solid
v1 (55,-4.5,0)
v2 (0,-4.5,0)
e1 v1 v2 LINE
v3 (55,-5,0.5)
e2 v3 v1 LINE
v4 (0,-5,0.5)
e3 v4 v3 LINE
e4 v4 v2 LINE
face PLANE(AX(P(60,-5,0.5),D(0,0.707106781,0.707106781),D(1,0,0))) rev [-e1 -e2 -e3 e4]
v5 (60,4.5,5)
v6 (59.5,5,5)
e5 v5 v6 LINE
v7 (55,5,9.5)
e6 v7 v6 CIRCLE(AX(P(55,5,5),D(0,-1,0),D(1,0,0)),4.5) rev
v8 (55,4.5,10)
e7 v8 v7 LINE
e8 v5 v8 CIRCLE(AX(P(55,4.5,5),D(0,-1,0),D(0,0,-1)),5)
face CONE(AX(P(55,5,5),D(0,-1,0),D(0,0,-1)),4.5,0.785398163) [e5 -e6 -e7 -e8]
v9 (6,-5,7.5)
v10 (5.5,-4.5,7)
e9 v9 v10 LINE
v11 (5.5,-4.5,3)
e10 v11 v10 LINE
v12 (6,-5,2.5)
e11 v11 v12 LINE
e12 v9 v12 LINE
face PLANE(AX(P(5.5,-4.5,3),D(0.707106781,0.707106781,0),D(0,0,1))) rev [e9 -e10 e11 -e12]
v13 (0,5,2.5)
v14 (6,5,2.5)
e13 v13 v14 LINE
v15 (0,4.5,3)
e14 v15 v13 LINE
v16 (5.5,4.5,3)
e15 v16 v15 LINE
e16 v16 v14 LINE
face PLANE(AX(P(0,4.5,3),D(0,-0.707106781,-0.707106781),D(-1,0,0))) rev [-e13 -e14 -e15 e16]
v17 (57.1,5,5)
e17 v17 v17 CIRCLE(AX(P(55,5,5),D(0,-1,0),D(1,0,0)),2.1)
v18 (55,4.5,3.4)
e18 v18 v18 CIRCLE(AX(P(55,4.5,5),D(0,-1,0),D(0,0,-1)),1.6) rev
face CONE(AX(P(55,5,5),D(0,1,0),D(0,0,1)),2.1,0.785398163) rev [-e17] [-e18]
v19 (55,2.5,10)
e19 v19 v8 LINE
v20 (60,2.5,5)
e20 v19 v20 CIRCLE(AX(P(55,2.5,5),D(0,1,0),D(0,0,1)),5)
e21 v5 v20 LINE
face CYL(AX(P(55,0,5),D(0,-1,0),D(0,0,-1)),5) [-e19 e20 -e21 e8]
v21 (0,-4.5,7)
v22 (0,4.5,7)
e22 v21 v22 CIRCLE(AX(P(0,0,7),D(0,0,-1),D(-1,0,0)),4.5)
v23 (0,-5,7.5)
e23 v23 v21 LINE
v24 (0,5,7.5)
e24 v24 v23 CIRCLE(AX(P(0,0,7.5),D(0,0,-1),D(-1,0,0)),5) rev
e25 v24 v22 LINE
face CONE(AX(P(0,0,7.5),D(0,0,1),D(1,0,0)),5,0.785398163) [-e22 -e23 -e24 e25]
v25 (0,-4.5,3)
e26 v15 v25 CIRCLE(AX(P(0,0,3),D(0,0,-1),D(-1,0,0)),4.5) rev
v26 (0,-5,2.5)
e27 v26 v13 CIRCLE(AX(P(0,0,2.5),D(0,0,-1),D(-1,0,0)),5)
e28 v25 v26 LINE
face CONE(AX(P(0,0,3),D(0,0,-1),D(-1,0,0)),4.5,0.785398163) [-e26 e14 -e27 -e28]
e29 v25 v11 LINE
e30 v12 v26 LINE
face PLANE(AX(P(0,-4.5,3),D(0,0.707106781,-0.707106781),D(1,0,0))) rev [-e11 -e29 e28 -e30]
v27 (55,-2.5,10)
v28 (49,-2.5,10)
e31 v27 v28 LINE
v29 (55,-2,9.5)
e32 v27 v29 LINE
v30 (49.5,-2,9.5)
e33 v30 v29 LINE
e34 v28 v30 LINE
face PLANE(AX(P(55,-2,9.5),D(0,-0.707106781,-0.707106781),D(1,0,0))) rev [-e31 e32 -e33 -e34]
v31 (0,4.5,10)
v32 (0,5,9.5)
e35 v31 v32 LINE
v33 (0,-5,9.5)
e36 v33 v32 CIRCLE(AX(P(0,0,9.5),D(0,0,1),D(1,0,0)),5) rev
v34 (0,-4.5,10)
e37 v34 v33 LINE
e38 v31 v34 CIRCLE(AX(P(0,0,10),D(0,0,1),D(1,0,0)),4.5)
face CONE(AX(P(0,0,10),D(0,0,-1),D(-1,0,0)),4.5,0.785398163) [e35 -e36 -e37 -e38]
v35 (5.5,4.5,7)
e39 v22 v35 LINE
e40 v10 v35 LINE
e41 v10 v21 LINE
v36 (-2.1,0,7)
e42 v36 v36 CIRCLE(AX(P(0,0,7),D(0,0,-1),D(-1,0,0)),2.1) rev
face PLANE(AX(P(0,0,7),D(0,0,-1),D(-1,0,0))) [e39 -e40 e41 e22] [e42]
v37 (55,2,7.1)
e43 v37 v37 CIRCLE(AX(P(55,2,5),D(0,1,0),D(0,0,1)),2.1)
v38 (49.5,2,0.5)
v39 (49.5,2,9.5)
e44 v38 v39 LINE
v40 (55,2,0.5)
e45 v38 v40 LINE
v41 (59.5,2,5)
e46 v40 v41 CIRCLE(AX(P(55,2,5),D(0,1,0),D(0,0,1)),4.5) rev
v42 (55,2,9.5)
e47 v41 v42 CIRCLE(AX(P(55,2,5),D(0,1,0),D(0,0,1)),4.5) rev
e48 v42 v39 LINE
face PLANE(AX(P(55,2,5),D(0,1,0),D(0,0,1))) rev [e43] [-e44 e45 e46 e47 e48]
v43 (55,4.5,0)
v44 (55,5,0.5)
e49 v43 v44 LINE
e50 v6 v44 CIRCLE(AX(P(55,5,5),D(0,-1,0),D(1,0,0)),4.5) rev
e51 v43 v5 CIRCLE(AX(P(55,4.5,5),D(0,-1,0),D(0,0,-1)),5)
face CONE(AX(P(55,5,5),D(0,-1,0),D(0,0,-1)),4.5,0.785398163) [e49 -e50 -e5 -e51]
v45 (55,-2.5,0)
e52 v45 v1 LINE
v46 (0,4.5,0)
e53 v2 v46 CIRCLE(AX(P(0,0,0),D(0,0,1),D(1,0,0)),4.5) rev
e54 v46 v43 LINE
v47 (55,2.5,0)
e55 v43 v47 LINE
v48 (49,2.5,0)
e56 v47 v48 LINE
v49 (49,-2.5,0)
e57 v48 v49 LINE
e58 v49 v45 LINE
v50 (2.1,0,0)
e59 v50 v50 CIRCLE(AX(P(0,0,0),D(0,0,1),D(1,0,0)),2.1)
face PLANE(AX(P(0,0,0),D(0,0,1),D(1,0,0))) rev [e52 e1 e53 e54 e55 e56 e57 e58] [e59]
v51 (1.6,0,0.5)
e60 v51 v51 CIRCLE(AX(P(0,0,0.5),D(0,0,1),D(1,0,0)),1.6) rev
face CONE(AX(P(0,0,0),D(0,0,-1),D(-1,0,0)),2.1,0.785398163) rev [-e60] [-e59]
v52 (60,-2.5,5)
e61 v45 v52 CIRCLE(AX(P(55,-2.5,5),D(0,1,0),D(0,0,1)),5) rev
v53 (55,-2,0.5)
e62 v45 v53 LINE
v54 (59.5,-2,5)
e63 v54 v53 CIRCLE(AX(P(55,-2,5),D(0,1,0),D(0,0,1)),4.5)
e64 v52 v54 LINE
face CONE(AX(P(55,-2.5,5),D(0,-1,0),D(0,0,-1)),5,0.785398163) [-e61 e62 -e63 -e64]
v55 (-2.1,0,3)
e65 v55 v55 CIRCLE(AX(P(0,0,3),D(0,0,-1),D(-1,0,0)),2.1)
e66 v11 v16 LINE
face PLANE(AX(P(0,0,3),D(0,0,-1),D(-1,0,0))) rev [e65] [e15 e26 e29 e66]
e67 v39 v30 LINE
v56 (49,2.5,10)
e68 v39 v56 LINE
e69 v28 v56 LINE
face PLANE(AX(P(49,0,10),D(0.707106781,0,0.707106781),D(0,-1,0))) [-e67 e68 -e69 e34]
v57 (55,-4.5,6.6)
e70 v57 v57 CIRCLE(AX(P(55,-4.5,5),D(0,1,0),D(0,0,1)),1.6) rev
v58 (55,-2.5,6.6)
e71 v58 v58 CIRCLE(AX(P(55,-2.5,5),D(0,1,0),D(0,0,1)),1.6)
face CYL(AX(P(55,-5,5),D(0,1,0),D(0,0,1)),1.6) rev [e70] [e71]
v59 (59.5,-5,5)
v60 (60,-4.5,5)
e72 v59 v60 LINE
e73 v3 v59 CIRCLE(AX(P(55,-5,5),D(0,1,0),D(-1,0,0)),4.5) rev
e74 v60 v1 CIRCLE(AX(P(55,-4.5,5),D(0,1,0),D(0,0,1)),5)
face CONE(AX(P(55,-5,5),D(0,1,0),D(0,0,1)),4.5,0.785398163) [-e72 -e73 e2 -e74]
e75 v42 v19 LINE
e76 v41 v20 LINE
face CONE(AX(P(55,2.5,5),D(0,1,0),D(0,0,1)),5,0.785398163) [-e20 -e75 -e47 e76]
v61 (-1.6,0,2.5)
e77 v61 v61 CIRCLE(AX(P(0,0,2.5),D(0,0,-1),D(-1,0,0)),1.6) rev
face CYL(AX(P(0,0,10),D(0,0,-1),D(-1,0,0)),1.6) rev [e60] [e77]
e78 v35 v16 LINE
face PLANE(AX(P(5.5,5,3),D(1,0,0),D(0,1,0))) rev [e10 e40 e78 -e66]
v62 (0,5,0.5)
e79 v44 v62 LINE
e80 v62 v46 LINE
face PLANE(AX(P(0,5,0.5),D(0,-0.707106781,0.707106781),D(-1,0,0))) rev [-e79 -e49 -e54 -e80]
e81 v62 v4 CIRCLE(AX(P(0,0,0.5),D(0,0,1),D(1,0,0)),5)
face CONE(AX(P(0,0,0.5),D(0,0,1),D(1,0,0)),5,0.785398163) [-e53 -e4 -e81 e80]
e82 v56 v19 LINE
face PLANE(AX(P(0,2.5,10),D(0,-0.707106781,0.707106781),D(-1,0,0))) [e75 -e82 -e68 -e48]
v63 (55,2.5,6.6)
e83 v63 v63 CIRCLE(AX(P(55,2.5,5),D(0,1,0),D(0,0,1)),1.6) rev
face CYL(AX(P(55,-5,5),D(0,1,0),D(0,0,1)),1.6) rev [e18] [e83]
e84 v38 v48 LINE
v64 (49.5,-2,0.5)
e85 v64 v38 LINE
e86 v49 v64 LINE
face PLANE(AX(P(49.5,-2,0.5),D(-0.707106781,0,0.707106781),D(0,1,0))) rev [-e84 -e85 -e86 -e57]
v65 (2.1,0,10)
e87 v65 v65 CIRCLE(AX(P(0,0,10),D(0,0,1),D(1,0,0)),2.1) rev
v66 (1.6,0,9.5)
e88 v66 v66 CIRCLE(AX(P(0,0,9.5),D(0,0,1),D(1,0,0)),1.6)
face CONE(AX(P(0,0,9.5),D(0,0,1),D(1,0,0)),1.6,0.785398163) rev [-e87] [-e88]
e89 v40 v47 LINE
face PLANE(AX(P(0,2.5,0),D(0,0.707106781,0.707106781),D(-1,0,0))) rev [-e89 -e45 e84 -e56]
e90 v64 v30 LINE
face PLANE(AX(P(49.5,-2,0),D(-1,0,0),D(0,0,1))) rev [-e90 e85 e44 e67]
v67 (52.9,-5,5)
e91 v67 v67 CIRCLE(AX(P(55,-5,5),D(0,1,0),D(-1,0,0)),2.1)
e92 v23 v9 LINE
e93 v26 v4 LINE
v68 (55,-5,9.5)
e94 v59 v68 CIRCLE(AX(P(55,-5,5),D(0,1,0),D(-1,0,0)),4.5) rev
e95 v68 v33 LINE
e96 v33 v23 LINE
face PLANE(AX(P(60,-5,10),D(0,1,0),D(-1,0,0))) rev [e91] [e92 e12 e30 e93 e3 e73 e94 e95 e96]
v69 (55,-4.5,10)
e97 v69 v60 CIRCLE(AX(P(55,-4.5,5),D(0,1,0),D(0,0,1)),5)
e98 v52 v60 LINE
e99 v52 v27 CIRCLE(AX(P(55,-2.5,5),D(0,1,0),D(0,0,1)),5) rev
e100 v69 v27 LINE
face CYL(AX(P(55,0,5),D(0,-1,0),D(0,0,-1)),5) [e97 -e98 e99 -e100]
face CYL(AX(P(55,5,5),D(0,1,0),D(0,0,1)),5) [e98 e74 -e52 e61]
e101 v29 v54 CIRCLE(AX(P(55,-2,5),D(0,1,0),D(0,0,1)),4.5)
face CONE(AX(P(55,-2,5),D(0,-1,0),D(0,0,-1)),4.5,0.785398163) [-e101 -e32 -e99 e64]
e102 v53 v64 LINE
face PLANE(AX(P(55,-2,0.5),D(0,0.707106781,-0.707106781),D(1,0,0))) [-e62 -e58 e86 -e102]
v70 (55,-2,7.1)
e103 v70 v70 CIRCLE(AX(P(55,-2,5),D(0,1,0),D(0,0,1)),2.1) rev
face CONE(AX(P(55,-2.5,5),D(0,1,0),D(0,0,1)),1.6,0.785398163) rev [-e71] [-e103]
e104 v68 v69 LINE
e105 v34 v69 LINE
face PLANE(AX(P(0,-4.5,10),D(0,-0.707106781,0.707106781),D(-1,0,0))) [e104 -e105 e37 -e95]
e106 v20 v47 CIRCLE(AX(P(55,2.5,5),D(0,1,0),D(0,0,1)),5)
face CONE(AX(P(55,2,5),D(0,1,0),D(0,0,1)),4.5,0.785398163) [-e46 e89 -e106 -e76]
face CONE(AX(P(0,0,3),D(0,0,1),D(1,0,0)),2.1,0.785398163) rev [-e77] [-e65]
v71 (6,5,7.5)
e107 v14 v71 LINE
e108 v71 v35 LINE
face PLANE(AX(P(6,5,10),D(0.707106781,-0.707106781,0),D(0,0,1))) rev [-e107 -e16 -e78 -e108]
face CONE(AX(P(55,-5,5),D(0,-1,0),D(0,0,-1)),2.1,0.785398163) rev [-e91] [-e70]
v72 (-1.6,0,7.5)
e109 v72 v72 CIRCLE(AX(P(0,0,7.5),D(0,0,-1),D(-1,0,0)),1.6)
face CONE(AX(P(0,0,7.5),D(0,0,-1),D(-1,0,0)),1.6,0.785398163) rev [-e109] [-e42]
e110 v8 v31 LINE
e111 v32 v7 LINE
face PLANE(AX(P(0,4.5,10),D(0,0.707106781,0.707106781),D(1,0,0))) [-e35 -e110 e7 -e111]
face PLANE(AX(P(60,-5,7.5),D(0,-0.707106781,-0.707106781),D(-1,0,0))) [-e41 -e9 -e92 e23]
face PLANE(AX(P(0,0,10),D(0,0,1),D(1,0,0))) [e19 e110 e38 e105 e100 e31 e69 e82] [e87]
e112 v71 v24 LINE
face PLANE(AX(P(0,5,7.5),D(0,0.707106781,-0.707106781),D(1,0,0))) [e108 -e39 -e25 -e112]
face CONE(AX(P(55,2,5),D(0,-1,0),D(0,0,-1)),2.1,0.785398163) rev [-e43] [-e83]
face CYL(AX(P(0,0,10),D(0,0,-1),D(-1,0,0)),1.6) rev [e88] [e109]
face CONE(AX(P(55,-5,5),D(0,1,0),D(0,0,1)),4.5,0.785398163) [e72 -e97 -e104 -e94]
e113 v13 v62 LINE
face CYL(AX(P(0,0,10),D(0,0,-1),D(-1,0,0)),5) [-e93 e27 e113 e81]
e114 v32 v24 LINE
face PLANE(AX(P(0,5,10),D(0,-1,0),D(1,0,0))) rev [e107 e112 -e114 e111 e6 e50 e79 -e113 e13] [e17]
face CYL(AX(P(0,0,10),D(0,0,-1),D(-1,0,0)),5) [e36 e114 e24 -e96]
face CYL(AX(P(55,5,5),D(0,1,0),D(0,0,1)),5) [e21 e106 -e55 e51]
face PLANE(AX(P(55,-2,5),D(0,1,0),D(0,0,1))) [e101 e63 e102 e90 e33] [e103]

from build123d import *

# Parameters (mm, degrees)
SKETCH1_R               = 1.6
BOSS_EXTRUDE1_DEPTH     = 10
CUT_EXTRUDE1_START      = -7
CUT_EXTRUDE1_DEPTH      = 4
FILLET1_R               = 5
CUT_EXTRUDE2_START      = 49.5
CUT_EXTRUDE2_OUTLINE_W  = 4
CUT_EXTRUDE2_OUTLINE_H  = 10
CUT_EXTRUDE2_DEPTH      = 10.5
CUT_EXTRUDE3_DEPTH      = 62.64414003
CUT_EXTRUDE3_DEPTH_BACK = 62.64414003
SKETCH5_R               = 1.6
CHAMFER1_SIZE           = 0.5


# Read off the part's stored shape, not the designer's step: Cut-Extrude2
with BuildPart() as part:
    # Sketch1 → Boss-Extrude1 (new body)
    with BuildSketch(Plane.XY):
        with BuildLine():
            Line((0, 5), (60, 5))
            Line((60, 5), (60, -5))
            Line((60, -5), (0, -5))
            ThreePointArc((0, -5), (-5, 0), (0, 5))
        make_face()
        Circle(SKETCH1_R, mode=Mode.SUBTRACT)
    extrude(amount=BOSS_EXTRUDE1_DEPTH)

    # Sketch2 → Cut-Extrude1 (cut)
    with BuildSketch(Plane.XY.offset(10).offset(CUT_EXTRUDE1_START)):
        with BuildLine():
            Line((5.5, 5), (5.5, -5))
            Line((5.5, -5), (0, -5))
            ThreePointArc((0, -5), (-5, 0), (0, 5))
            Line((0, 5), (5.5, 5))
        make_face()
    extrude(amount=CUT_EXTRUDE1_DEPTH, mode=Mode.SUBTRACT)

    # Fillet1
    fillet1_edges = [part.edges().sort_by_distance(p)[0] for p in [
        (60, 0, 0),
        (60, 0, 10),
    ]]
    fillet(fillet1_edges, radius=FILLET1_R - 0.0001)  # a hair under: the kernel refuses the full size

    # Cut-Extrude2 outline → Cut-Extrude2 (cut)
    with BuildSketch(Plane.YZ.offset(CUT_EXTRUDE2_START)):
        with Locations((0, 5)):
            Rectangle(CUT_EXTRUDE2_OUTLINE_W, CUT_EXTRUDE2_OUTLINE_H)
    extrude(amount=CUT_EXTRUDE2_DEPTH, mode=Mode.SUBTRACT)

    # Sketch5 → Cut-Extrude3 (cut, two sides: drawn at the far end of the back side and taken through both)
    with BuildSketch(Plane(origin=(0, 5, 0), x_dir=(1, 0, 0), z_dir=(0, 1, 0)).offset(-CUT_EXTRUDE3_DEPTH_BACK)):
        with Locations(Location((55, -5, 0), (0, 0, 270))):
            Circle(SKETCH5_R)
    extrude(amount=CUT_EXTRUDE3_DEPTH + CUT_EXTRUDE3_DEPTH_BACK, mode=Mode.SUBTRACT)

    # Chamfer1
    chamfer1_edges = [part.edges().sort_by_distance(p)[0] for p in [
        (-1.6, 0, 0),
        (-1.6, 0, 10),
        (-1.6, 0, 3),
        (2.75, 5, 3),
        (5.5, 5, 5),
        (2.75, -5, 3),
        (5.5, -5, 5),
        (-5, 0, 3),
        (-1.6, 0, 7),
        (2.75, 5, 7),
        (-5, 0, 7),
        (2.75, -5, 7),
        (27.50005, 5, 10),
        (27.50005, 5, 0),
        (58.535563195, 5, 8.535563195),
        (58.535563195, 5, 1.464436805),
        (58.535563195, -5, 8.535563195),
        (58.535563195, -5, 1.464436805),
        (-5, 0, 10),
        (58.535563195, 2, 1.464436805),
        (58.535563195, -2, 1.464436805),
        (58.535563195, -2, 8.535563195),
        (27.50005, -5, 0),
        (52.25005, -2, 10),
        (49.5, 0, 10),
        (52.25005, -2, 0),
        (49.5, 0, 0),
        (58.535563195, 2, 8.535563195),
        (52.25005, 2, 0),
        (52.25005, 2, 10),
        (-5, 0, 0),
        (55, 2, 3.4),
        (55, 5, 3.4),
        (55, -2, 3.4),
        (55, -5, 3.4),
        (27.50005, -5, 10),
    ]]
    chamfer(chamfer1_edges, length=CHAMFER1_SIZE)


solid = part.part
